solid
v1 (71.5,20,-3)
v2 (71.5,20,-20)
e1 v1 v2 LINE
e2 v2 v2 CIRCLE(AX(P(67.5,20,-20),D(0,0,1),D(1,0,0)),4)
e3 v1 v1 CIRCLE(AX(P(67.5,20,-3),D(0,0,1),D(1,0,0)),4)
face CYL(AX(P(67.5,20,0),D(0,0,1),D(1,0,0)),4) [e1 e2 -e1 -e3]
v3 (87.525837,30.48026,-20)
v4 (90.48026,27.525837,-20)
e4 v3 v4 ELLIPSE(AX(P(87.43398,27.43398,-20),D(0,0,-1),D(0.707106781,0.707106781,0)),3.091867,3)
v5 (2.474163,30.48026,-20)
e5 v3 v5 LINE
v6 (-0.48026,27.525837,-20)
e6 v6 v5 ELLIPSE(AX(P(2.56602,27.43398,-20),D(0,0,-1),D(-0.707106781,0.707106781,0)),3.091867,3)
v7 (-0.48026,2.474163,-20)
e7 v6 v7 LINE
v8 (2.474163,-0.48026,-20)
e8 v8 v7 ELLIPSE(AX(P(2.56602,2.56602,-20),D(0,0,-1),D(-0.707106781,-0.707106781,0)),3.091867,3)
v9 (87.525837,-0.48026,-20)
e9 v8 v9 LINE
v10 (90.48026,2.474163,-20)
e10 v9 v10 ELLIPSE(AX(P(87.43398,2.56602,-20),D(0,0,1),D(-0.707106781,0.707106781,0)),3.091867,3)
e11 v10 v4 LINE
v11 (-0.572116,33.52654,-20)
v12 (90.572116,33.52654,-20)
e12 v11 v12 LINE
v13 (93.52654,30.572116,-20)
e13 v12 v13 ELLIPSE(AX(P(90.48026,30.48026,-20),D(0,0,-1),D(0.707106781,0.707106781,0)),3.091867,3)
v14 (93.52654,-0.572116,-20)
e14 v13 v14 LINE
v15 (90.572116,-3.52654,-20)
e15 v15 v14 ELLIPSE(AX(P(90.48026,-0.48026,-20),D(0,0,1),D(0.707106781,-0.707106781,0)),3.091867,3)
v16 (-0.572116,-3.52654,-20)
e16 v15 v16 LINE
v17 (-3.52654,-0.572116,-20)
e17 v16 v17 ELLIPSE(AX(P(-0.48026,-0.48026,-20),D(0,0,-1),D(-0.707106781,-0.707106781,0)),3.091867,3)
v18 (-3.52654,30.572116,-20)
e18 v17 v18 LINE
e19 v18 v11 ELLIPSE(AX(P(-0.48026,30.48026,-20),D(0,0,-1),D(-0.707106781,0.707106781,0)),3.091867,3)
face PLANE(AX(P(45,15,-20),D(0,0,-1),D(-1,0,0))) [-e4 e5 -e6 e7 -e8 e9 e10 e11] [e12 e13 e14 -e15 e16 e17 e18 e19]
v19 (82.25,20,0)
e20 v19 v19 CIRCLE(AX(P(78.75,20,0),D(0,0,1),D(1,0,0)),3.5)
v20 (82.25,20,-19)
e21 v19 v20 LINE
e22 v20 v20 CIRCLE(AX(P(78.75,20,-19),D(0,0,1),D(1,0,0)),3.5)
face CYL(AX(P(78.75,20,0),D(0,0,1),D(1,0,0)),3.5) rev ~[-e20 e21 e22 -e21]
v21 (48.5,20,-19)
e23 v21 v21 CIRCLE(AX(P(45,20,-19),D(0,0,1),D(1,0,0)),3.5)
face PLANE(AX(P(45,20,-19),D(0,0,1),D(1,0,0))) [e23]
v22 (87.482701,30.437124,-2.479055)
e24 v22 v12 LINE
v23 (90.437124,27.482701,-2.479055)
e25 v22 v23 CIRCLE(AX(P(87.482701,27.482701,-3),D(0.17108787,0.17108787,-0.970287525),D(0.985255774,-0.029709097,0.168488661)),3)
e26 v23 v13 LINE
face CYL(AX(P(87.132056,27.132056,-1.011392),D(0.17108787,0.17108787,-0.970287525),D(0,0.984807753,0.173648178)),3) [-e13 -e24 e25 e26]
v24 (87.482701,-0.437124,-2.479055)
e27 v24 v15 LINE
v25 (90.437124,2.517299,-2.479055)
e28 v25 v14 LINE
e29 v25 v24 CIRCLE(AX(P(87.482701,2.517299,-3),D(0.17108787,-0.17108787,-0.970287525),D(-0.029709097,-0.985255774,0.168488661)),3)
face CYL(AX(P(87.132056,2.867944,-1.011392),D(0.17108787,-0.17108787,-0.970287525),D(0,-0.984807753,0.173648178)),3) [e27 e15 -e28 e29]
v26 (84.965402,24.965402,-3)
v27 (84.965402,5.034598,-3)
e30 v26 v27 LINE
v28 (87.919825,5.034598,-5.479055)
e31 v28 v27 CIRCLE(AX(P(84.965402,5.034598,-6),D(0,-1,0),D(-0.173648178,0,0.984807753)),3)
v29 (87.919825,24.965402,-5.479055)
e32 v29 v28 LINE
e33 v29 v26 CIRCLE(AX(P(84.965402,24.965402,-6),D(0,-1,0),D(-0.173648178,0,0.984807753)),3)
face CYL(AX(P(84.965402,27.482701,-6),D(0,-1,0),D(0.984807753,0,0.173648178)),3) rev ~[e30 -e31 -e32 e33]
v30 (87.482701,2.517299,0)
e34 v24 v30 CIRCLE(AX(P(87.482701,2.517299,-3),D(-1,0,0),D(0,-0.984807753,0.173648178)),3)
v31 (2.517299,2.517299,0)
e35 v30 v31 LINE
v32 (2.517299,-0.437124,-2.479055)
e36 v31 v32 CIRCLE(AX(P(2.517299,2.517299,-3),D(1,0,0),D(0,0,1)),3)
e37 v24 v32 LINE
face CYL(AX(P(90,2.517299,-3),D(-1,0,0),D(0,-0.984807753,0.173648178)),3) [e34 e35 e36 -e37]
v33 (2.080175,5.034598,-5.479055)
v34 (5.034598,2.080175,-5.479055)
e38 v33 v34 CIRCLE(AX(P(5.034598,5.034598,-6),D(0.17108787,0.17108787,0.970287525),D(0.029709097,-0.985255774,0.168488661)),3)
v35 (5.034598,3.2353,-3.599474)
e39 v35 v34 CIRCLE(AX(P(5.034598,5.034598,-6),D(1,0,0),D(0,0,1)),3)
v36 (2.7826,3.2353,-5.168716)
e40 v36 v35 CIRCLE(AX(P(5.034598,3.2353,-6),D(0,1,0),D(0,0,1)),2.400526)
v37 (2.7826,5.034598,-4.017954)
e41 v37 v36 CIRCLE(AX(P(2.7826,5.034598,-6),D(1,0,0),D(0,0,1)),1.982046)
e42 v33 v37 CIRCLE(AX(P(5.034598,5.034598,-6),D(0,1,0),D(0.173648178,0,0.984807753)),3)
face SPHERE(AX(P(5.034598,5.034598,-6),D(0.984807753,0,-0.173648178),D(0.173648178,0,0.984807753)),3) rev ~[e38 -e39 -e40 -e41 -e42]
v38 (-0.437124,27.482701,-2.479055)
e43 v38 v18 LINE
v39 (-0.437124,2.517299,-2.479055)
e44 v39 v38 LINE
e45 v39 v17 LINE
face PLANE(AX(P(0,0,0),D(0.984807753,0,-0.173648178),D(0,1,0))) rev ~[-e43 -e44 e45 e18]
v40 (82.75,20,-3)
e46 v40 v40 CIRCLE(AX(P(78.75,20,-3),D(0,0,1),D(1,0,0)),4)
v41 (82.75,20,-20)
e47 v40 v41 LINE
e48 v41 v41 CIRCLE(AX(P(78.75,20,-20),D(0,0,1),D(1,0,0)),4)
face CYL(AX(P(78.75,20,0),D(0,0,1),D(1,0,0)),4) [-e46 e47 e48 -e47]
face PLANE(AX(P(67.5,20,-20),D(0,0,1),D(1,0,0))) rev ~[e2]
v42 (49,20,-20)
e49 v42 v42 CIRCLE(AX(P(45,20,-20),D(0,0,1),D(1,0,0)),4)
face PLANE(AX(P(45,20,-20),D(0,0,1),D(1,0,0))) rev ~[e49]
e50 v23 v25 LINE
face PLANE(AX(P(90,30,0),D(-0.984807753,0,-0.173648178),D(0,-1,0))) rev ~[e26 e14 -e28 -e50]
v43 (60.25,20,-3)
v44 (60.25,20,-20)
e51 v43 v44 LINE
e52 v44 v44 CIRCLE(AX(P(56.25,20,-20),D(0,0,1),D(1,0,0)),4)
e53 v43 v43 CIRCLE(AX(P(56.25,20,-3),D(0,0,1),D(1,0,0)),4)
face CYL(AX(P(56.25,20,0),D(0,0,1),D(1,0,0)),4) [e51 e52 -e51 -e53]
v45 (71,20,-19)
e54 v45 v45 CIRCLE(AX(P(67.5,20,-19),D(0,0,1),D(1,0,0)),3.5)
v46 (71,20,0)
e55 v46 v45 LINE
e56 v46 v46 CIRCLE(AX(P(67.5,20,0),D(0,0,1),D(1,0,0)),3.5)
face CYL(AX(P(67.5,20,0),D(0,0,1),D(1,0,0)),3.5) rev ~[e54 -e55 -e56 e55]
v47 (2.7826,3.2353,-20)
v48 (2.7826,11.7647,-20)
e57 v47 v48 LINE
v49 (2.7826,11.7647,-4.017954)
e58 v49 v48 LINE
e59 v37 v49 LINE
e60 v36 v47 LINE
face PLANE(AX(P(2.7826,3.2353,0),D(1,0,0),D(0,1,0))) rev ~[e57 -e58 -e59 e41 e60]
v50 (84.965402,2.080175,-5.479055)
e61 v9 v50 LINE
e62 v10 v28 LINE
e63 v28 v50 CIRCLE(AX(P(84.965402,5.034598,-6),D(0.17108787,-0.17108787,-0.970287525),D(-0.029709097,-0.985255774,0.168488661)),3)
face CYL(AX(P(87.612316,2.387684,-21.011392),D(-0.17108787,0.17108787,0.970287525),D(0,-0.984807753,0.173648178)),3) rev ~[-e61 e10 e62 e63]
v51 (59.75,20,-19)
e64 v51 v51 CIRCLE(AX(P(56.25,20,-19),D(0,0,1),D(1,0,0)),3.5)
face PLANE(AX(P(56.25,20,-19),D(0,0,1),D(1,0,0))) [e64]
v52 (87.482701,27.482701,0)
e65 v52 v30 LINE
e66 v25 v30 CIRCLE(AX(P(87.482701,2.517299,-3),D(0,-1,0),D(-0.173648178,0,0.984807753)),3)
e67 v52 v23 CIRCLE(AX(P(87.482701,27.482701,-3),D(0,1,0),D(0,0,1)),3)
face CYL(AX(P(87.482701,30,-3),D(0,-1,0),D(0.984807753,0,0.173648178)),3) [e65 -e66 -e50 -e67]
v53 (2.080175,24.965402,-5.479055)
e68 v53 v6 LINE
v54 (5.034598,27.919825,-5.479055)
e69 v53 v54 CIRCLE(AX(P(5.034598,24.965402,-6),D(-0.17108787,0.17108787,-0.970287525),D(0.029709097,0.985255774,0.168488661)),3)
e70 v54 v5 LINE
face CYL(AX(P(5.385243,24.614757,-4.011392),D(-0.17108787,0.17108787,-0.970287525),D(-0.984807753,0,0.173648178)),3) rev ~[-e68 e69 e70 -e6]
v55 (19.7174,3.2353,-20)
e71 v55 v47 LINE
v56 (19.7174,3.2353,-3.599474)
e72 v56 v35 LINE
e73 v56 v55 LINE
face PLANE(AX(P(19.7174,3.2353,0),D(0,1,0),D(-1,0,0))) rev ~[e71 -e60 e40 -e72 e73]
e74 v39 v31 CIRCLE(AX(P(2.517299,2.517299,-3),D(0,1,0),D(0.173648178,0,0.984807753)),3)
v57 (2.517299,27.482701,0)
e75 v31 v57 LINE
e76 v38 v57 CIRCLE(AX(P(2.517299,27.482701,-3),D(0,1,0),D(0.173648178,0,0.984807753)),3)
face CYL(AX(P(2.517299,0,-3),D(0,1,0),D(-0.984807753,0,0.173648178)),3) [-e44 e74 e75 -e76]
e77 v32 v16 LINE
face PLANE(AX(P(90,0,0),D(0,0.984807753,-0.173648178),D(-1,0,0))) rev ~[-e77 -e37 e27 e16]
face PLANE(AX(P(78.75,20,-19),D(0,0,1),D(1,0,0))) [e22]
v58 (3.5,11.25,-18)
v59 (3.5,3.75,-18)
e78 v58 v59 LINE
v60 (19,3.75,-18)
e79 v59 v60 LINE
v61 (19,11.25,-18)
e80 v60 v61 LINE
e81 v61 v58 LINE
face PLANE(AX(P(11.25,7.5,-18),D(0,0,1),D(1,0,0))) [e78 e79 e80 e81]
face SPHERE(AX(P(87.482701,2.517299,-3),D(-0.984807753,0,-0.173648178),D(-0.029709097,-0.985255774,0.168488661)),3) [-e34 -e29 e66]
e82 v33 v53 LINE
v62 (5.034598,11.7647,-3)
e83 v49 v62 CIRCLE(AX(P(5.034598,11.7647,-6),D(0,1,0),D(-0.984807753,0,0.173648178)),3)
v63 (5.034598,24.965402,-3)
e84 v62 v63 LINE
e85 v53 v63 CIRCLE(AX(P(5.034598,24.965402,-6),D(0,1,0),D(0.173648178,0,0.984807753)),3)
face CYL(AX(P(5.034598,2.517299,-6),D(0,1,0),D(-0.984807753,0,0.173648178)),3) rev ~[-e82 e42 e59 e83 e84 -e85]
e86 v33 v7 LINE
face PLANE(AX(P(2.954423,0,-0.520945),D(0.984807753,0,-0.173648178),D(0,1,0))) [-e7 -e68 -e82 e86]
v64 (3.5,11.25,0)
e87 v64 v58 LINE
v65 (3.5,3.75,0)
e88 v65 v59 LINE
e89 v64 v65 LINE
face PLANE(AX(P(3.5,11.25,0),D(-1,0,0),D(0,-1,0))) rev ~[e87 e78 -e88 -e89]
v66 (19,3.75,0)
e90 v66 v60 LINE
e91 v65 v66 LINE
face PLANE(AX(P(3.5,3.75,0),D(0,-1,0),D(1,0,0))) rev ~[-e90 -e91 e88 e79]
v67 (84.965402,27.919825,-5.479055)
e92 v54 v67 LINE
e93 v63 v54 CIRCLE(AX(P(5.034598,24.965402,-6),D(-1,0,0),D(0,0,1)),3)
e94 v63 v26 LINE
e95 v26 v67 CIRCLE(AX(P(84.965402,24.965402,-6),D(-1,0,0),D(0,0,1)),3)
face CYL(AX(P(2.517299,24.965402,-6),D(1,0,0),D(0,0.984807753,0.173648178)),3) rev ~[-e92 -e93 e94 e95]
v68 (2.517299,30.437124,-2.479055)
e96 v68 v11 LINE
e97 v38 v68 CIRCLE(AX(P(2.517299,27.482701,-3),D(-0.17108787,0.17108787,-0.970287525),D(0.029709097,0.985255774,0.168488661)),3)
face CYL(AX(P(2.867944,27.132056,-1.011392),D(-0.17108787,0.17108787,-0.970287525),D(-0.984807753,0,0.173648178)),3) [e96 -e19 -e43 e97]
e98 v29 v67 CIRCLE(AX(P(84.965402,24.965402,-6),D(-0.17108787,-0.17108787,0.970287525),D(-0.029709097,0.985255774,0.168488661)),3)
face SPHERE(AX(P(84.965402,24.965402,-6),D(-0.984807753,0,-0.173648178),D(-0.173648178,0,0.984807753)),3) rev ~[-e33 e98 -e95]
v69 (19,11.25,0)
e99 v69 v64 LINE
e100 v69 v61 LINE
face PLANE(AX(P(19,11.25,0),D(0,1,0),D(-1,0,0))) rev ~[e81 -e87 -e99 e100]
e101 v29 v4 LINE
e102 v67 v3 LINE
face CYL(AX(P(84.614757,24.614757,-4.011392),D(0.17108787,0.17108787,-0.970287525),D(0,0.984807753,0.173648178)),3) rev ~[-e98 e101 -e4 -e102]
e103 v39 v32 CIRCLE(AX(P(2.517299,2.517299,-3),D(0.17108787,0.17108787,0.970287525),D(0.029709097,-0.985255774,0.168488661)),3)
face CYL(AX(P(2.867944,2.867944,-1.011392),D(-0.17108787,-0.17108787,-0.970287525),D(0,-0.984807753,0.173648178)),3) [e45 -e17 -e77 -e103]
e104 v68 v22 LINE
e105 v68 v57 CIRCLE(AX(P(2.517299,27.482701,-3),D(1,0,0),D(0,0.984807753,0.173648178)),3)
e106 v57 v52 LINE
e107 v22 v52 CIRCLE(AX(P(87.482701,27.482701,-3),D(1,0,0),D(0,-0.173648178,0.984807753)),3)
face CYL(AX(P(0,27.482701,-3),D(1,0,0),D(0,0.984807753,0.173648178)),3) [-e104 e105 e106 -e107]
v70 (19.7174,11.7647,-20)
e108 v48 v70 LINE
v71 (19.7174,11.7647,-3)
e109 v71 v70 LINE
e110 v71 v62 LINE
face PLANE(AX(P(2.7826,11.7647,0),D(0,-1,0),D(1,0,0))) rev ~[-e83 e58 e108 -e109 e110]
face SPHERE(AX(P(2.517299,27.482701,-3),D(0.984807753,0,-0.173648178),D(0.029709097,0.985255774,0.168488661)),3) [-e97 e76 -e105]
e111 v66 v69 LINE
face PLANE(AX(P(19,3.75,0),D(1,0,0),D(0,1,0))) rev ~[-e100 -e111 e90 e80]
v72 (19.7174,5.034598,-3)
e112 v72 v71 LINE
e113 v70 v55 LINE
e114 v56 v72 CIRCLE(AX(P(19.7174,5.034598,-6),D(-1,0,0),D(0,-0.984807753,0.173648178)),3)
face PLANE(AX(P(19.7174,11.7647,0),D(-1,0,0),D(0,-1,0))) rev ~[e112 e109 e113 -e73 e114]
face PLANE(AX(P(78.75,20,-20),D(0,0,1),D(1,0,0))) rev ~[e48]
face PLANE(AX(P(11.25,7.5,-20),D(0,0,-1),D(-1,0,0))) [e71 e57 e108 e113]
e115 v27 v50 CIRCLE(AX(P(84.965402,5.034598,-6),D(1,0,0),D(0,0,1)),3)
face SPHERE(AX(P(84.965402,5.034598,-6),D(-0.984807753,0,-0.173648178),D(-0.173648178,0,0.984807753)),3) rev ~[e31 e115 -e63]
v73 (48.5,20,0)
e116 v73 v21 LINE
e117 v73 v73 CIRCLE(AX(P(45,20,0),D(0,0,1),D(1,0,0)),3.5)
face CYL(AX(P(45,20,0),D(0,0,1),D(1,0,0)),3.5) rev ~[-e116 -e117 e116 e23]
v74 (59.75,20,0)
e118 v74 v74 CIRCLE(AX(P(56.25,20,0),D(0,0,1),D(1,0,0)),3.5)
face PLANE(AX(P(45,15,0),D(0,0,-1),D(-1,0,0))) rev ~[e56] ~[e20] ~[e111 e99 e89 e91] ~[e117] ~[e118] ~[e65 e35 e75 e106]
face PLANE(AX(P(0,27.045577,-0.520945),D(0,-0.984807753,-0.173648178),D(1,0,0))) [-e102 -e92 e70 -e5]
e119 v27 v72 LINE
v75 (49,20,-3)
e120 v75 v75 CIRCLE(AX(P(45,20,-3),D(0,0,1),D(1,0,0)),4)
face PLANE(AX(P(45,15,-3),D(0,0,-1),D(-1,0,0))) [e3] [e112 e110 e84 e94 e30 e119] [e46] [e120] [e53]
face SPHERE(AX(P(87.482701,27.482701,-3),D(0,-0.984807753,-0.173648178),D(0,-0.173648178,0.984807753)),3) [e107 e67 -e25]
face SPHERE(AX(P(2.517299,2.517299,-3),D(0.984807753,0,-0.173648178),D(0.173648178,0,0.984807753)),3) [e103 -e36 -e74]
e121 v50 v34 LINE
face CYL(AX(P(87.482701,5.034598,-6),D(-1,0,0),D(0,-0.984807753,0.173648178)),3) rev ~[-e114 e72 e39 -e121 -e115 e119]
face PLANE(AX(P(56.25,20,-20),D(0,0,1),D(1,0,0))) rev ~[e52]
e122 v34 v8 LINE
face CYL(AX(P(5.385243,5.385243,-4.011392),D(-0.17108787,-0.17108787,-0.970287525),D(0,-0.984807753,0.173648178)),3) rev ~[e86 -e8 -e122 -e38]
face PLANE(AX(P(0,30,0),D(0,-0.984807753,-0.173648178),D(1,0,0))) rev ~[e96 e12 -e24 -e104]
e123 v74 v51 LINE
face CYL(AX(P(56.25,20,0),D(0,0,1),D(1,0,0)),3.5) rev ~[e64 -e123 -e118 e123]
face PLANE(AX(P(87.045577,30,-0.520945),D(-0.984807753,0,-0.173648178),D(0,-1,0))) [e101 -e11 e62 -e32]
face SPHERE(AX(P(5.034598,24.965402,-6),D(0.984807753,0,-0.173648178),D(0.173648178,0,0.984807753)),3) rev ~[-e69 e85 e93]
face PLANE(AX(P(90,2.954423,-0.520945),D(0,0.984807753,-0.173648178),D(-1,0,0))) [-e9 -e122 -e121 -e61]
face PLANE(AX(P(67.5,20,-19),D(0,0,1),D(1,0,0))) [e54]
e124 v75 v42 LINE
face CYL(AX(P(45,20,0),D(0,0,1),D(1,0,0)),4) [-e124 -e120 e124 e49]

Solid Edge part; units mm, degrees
sketch "Sketch1" plane through (0, 0, 0) normal (0, 0, 1) x (1, 0, 0)
  line L0 (90, 0) -> (0, 0)
  line L1 (0, 0) -> (0, 30)
  line L2 (0, 30) -> (90, 30)
  line L3 (90, 30) -> (90, 0)
extrude "Protrusion1" add sketch "Sketch1" against normal blind 20
draft "Draft_2" angle 10 neutral plane through (45, 15, 0) normal (0, 0, 1) pull direction (0, 0, 1) face at (75.9, 0, -16.4667) face at (90, 25.3, -16.4667) face at (0, 4.7, -16.4667) face at (14.1, 30, -16.4667)
shell "Thinwall_1" thickness 3 removed faces 1 at (78.3216, 3.0195, -20)
fillet "Round_1" radius 3 16 edges at (45, 0, 0) (91.7633, -1.7633, -10) (90, 15, 0) (45, 27.4827, -3) (45, 30, 0) (91.7633, 31.7633, -10) (-1.7633, 31.7633, -10) (0, 15, 0) (-1.7633, -1.7633, -10) (45, 2.5173, -3) (2.5173, 15, -3) (87.4827, 15, -3) (88.9815, 1.0185, -11.5) (1.0185, 1.0185, -11.5) (1.0185, 28.9815, -11.5) (88.9815, 28.9815, -11.5)
sketch "Sketch2" plane through (0, 0, 0) normal (0, 0, 1) x (1, 0, 0)
  circle A0 centre (45, 20) radius 4
extrude "ExtrudedProtrusion_3" add sketch "Sketch2" against normal blind 20
sketch "Sketch3" plane through (0, 0, 0) normal (0, 0, 1) x (1, 0, 0)
  circle A0 centre (78.75, 20) radius 4
  circle A1 centre (67.5, 20) radius 4
  circle A2 centre (56.25, 20) radius 4
extrude "ExtrudedProtrusion_4" add sketch "Sketch3" against normal blind 20
sketch "Sketch4" plane through (0, 0, 0) normal (0, 0, 1) x (1, 0, 0)
  circle A0 centre (78.75, 20) radius 3.5
  circle A1 centre (67.5, 20) radius 3.5
  circle A2 centre (56.25, 20) radius 3.5
  circle A3 centre (45, 20) radius 3.5
extrude "ExtrudedCutout_3" cut sketch "Sketch4" against normal blind 19
sketch "Sketch5" plane through (0, 0, 0) normal (0, 0, 1) x (1, 0, 0)
  line L0 (2.7826, 11.7647) -> (19.7174, 11.7647)
  line L1 (19.7174, 11.7647) -> (19.7174, 3.2353)
  line L2 (19.7174, 3.2353) -> (2.7826, 3.2353)
  line L3 (2.7826, 3.2353) -> (2.7826, 11.7647)
extrude "ExtrudedProtrusion_5" add sketch "Sketch5" against normal blind 20
sketch "Sketch6" plane through (0, 0, 0) normal (0, 0, 1) x (1, 0, 0)
  line L0 (19, 3.75) -> (19, 11.25)
  line L1 (19, 11.25) -> (3.5, 11.25)
  line L2 (3.5, 11.25) -> (3.5, 3.75)
  line L3 (3.5, 3.75) -> (19, 3.75)
extrude "ExtrudedCutout_4" cut sketch "Sketch6" against normal blind 18
